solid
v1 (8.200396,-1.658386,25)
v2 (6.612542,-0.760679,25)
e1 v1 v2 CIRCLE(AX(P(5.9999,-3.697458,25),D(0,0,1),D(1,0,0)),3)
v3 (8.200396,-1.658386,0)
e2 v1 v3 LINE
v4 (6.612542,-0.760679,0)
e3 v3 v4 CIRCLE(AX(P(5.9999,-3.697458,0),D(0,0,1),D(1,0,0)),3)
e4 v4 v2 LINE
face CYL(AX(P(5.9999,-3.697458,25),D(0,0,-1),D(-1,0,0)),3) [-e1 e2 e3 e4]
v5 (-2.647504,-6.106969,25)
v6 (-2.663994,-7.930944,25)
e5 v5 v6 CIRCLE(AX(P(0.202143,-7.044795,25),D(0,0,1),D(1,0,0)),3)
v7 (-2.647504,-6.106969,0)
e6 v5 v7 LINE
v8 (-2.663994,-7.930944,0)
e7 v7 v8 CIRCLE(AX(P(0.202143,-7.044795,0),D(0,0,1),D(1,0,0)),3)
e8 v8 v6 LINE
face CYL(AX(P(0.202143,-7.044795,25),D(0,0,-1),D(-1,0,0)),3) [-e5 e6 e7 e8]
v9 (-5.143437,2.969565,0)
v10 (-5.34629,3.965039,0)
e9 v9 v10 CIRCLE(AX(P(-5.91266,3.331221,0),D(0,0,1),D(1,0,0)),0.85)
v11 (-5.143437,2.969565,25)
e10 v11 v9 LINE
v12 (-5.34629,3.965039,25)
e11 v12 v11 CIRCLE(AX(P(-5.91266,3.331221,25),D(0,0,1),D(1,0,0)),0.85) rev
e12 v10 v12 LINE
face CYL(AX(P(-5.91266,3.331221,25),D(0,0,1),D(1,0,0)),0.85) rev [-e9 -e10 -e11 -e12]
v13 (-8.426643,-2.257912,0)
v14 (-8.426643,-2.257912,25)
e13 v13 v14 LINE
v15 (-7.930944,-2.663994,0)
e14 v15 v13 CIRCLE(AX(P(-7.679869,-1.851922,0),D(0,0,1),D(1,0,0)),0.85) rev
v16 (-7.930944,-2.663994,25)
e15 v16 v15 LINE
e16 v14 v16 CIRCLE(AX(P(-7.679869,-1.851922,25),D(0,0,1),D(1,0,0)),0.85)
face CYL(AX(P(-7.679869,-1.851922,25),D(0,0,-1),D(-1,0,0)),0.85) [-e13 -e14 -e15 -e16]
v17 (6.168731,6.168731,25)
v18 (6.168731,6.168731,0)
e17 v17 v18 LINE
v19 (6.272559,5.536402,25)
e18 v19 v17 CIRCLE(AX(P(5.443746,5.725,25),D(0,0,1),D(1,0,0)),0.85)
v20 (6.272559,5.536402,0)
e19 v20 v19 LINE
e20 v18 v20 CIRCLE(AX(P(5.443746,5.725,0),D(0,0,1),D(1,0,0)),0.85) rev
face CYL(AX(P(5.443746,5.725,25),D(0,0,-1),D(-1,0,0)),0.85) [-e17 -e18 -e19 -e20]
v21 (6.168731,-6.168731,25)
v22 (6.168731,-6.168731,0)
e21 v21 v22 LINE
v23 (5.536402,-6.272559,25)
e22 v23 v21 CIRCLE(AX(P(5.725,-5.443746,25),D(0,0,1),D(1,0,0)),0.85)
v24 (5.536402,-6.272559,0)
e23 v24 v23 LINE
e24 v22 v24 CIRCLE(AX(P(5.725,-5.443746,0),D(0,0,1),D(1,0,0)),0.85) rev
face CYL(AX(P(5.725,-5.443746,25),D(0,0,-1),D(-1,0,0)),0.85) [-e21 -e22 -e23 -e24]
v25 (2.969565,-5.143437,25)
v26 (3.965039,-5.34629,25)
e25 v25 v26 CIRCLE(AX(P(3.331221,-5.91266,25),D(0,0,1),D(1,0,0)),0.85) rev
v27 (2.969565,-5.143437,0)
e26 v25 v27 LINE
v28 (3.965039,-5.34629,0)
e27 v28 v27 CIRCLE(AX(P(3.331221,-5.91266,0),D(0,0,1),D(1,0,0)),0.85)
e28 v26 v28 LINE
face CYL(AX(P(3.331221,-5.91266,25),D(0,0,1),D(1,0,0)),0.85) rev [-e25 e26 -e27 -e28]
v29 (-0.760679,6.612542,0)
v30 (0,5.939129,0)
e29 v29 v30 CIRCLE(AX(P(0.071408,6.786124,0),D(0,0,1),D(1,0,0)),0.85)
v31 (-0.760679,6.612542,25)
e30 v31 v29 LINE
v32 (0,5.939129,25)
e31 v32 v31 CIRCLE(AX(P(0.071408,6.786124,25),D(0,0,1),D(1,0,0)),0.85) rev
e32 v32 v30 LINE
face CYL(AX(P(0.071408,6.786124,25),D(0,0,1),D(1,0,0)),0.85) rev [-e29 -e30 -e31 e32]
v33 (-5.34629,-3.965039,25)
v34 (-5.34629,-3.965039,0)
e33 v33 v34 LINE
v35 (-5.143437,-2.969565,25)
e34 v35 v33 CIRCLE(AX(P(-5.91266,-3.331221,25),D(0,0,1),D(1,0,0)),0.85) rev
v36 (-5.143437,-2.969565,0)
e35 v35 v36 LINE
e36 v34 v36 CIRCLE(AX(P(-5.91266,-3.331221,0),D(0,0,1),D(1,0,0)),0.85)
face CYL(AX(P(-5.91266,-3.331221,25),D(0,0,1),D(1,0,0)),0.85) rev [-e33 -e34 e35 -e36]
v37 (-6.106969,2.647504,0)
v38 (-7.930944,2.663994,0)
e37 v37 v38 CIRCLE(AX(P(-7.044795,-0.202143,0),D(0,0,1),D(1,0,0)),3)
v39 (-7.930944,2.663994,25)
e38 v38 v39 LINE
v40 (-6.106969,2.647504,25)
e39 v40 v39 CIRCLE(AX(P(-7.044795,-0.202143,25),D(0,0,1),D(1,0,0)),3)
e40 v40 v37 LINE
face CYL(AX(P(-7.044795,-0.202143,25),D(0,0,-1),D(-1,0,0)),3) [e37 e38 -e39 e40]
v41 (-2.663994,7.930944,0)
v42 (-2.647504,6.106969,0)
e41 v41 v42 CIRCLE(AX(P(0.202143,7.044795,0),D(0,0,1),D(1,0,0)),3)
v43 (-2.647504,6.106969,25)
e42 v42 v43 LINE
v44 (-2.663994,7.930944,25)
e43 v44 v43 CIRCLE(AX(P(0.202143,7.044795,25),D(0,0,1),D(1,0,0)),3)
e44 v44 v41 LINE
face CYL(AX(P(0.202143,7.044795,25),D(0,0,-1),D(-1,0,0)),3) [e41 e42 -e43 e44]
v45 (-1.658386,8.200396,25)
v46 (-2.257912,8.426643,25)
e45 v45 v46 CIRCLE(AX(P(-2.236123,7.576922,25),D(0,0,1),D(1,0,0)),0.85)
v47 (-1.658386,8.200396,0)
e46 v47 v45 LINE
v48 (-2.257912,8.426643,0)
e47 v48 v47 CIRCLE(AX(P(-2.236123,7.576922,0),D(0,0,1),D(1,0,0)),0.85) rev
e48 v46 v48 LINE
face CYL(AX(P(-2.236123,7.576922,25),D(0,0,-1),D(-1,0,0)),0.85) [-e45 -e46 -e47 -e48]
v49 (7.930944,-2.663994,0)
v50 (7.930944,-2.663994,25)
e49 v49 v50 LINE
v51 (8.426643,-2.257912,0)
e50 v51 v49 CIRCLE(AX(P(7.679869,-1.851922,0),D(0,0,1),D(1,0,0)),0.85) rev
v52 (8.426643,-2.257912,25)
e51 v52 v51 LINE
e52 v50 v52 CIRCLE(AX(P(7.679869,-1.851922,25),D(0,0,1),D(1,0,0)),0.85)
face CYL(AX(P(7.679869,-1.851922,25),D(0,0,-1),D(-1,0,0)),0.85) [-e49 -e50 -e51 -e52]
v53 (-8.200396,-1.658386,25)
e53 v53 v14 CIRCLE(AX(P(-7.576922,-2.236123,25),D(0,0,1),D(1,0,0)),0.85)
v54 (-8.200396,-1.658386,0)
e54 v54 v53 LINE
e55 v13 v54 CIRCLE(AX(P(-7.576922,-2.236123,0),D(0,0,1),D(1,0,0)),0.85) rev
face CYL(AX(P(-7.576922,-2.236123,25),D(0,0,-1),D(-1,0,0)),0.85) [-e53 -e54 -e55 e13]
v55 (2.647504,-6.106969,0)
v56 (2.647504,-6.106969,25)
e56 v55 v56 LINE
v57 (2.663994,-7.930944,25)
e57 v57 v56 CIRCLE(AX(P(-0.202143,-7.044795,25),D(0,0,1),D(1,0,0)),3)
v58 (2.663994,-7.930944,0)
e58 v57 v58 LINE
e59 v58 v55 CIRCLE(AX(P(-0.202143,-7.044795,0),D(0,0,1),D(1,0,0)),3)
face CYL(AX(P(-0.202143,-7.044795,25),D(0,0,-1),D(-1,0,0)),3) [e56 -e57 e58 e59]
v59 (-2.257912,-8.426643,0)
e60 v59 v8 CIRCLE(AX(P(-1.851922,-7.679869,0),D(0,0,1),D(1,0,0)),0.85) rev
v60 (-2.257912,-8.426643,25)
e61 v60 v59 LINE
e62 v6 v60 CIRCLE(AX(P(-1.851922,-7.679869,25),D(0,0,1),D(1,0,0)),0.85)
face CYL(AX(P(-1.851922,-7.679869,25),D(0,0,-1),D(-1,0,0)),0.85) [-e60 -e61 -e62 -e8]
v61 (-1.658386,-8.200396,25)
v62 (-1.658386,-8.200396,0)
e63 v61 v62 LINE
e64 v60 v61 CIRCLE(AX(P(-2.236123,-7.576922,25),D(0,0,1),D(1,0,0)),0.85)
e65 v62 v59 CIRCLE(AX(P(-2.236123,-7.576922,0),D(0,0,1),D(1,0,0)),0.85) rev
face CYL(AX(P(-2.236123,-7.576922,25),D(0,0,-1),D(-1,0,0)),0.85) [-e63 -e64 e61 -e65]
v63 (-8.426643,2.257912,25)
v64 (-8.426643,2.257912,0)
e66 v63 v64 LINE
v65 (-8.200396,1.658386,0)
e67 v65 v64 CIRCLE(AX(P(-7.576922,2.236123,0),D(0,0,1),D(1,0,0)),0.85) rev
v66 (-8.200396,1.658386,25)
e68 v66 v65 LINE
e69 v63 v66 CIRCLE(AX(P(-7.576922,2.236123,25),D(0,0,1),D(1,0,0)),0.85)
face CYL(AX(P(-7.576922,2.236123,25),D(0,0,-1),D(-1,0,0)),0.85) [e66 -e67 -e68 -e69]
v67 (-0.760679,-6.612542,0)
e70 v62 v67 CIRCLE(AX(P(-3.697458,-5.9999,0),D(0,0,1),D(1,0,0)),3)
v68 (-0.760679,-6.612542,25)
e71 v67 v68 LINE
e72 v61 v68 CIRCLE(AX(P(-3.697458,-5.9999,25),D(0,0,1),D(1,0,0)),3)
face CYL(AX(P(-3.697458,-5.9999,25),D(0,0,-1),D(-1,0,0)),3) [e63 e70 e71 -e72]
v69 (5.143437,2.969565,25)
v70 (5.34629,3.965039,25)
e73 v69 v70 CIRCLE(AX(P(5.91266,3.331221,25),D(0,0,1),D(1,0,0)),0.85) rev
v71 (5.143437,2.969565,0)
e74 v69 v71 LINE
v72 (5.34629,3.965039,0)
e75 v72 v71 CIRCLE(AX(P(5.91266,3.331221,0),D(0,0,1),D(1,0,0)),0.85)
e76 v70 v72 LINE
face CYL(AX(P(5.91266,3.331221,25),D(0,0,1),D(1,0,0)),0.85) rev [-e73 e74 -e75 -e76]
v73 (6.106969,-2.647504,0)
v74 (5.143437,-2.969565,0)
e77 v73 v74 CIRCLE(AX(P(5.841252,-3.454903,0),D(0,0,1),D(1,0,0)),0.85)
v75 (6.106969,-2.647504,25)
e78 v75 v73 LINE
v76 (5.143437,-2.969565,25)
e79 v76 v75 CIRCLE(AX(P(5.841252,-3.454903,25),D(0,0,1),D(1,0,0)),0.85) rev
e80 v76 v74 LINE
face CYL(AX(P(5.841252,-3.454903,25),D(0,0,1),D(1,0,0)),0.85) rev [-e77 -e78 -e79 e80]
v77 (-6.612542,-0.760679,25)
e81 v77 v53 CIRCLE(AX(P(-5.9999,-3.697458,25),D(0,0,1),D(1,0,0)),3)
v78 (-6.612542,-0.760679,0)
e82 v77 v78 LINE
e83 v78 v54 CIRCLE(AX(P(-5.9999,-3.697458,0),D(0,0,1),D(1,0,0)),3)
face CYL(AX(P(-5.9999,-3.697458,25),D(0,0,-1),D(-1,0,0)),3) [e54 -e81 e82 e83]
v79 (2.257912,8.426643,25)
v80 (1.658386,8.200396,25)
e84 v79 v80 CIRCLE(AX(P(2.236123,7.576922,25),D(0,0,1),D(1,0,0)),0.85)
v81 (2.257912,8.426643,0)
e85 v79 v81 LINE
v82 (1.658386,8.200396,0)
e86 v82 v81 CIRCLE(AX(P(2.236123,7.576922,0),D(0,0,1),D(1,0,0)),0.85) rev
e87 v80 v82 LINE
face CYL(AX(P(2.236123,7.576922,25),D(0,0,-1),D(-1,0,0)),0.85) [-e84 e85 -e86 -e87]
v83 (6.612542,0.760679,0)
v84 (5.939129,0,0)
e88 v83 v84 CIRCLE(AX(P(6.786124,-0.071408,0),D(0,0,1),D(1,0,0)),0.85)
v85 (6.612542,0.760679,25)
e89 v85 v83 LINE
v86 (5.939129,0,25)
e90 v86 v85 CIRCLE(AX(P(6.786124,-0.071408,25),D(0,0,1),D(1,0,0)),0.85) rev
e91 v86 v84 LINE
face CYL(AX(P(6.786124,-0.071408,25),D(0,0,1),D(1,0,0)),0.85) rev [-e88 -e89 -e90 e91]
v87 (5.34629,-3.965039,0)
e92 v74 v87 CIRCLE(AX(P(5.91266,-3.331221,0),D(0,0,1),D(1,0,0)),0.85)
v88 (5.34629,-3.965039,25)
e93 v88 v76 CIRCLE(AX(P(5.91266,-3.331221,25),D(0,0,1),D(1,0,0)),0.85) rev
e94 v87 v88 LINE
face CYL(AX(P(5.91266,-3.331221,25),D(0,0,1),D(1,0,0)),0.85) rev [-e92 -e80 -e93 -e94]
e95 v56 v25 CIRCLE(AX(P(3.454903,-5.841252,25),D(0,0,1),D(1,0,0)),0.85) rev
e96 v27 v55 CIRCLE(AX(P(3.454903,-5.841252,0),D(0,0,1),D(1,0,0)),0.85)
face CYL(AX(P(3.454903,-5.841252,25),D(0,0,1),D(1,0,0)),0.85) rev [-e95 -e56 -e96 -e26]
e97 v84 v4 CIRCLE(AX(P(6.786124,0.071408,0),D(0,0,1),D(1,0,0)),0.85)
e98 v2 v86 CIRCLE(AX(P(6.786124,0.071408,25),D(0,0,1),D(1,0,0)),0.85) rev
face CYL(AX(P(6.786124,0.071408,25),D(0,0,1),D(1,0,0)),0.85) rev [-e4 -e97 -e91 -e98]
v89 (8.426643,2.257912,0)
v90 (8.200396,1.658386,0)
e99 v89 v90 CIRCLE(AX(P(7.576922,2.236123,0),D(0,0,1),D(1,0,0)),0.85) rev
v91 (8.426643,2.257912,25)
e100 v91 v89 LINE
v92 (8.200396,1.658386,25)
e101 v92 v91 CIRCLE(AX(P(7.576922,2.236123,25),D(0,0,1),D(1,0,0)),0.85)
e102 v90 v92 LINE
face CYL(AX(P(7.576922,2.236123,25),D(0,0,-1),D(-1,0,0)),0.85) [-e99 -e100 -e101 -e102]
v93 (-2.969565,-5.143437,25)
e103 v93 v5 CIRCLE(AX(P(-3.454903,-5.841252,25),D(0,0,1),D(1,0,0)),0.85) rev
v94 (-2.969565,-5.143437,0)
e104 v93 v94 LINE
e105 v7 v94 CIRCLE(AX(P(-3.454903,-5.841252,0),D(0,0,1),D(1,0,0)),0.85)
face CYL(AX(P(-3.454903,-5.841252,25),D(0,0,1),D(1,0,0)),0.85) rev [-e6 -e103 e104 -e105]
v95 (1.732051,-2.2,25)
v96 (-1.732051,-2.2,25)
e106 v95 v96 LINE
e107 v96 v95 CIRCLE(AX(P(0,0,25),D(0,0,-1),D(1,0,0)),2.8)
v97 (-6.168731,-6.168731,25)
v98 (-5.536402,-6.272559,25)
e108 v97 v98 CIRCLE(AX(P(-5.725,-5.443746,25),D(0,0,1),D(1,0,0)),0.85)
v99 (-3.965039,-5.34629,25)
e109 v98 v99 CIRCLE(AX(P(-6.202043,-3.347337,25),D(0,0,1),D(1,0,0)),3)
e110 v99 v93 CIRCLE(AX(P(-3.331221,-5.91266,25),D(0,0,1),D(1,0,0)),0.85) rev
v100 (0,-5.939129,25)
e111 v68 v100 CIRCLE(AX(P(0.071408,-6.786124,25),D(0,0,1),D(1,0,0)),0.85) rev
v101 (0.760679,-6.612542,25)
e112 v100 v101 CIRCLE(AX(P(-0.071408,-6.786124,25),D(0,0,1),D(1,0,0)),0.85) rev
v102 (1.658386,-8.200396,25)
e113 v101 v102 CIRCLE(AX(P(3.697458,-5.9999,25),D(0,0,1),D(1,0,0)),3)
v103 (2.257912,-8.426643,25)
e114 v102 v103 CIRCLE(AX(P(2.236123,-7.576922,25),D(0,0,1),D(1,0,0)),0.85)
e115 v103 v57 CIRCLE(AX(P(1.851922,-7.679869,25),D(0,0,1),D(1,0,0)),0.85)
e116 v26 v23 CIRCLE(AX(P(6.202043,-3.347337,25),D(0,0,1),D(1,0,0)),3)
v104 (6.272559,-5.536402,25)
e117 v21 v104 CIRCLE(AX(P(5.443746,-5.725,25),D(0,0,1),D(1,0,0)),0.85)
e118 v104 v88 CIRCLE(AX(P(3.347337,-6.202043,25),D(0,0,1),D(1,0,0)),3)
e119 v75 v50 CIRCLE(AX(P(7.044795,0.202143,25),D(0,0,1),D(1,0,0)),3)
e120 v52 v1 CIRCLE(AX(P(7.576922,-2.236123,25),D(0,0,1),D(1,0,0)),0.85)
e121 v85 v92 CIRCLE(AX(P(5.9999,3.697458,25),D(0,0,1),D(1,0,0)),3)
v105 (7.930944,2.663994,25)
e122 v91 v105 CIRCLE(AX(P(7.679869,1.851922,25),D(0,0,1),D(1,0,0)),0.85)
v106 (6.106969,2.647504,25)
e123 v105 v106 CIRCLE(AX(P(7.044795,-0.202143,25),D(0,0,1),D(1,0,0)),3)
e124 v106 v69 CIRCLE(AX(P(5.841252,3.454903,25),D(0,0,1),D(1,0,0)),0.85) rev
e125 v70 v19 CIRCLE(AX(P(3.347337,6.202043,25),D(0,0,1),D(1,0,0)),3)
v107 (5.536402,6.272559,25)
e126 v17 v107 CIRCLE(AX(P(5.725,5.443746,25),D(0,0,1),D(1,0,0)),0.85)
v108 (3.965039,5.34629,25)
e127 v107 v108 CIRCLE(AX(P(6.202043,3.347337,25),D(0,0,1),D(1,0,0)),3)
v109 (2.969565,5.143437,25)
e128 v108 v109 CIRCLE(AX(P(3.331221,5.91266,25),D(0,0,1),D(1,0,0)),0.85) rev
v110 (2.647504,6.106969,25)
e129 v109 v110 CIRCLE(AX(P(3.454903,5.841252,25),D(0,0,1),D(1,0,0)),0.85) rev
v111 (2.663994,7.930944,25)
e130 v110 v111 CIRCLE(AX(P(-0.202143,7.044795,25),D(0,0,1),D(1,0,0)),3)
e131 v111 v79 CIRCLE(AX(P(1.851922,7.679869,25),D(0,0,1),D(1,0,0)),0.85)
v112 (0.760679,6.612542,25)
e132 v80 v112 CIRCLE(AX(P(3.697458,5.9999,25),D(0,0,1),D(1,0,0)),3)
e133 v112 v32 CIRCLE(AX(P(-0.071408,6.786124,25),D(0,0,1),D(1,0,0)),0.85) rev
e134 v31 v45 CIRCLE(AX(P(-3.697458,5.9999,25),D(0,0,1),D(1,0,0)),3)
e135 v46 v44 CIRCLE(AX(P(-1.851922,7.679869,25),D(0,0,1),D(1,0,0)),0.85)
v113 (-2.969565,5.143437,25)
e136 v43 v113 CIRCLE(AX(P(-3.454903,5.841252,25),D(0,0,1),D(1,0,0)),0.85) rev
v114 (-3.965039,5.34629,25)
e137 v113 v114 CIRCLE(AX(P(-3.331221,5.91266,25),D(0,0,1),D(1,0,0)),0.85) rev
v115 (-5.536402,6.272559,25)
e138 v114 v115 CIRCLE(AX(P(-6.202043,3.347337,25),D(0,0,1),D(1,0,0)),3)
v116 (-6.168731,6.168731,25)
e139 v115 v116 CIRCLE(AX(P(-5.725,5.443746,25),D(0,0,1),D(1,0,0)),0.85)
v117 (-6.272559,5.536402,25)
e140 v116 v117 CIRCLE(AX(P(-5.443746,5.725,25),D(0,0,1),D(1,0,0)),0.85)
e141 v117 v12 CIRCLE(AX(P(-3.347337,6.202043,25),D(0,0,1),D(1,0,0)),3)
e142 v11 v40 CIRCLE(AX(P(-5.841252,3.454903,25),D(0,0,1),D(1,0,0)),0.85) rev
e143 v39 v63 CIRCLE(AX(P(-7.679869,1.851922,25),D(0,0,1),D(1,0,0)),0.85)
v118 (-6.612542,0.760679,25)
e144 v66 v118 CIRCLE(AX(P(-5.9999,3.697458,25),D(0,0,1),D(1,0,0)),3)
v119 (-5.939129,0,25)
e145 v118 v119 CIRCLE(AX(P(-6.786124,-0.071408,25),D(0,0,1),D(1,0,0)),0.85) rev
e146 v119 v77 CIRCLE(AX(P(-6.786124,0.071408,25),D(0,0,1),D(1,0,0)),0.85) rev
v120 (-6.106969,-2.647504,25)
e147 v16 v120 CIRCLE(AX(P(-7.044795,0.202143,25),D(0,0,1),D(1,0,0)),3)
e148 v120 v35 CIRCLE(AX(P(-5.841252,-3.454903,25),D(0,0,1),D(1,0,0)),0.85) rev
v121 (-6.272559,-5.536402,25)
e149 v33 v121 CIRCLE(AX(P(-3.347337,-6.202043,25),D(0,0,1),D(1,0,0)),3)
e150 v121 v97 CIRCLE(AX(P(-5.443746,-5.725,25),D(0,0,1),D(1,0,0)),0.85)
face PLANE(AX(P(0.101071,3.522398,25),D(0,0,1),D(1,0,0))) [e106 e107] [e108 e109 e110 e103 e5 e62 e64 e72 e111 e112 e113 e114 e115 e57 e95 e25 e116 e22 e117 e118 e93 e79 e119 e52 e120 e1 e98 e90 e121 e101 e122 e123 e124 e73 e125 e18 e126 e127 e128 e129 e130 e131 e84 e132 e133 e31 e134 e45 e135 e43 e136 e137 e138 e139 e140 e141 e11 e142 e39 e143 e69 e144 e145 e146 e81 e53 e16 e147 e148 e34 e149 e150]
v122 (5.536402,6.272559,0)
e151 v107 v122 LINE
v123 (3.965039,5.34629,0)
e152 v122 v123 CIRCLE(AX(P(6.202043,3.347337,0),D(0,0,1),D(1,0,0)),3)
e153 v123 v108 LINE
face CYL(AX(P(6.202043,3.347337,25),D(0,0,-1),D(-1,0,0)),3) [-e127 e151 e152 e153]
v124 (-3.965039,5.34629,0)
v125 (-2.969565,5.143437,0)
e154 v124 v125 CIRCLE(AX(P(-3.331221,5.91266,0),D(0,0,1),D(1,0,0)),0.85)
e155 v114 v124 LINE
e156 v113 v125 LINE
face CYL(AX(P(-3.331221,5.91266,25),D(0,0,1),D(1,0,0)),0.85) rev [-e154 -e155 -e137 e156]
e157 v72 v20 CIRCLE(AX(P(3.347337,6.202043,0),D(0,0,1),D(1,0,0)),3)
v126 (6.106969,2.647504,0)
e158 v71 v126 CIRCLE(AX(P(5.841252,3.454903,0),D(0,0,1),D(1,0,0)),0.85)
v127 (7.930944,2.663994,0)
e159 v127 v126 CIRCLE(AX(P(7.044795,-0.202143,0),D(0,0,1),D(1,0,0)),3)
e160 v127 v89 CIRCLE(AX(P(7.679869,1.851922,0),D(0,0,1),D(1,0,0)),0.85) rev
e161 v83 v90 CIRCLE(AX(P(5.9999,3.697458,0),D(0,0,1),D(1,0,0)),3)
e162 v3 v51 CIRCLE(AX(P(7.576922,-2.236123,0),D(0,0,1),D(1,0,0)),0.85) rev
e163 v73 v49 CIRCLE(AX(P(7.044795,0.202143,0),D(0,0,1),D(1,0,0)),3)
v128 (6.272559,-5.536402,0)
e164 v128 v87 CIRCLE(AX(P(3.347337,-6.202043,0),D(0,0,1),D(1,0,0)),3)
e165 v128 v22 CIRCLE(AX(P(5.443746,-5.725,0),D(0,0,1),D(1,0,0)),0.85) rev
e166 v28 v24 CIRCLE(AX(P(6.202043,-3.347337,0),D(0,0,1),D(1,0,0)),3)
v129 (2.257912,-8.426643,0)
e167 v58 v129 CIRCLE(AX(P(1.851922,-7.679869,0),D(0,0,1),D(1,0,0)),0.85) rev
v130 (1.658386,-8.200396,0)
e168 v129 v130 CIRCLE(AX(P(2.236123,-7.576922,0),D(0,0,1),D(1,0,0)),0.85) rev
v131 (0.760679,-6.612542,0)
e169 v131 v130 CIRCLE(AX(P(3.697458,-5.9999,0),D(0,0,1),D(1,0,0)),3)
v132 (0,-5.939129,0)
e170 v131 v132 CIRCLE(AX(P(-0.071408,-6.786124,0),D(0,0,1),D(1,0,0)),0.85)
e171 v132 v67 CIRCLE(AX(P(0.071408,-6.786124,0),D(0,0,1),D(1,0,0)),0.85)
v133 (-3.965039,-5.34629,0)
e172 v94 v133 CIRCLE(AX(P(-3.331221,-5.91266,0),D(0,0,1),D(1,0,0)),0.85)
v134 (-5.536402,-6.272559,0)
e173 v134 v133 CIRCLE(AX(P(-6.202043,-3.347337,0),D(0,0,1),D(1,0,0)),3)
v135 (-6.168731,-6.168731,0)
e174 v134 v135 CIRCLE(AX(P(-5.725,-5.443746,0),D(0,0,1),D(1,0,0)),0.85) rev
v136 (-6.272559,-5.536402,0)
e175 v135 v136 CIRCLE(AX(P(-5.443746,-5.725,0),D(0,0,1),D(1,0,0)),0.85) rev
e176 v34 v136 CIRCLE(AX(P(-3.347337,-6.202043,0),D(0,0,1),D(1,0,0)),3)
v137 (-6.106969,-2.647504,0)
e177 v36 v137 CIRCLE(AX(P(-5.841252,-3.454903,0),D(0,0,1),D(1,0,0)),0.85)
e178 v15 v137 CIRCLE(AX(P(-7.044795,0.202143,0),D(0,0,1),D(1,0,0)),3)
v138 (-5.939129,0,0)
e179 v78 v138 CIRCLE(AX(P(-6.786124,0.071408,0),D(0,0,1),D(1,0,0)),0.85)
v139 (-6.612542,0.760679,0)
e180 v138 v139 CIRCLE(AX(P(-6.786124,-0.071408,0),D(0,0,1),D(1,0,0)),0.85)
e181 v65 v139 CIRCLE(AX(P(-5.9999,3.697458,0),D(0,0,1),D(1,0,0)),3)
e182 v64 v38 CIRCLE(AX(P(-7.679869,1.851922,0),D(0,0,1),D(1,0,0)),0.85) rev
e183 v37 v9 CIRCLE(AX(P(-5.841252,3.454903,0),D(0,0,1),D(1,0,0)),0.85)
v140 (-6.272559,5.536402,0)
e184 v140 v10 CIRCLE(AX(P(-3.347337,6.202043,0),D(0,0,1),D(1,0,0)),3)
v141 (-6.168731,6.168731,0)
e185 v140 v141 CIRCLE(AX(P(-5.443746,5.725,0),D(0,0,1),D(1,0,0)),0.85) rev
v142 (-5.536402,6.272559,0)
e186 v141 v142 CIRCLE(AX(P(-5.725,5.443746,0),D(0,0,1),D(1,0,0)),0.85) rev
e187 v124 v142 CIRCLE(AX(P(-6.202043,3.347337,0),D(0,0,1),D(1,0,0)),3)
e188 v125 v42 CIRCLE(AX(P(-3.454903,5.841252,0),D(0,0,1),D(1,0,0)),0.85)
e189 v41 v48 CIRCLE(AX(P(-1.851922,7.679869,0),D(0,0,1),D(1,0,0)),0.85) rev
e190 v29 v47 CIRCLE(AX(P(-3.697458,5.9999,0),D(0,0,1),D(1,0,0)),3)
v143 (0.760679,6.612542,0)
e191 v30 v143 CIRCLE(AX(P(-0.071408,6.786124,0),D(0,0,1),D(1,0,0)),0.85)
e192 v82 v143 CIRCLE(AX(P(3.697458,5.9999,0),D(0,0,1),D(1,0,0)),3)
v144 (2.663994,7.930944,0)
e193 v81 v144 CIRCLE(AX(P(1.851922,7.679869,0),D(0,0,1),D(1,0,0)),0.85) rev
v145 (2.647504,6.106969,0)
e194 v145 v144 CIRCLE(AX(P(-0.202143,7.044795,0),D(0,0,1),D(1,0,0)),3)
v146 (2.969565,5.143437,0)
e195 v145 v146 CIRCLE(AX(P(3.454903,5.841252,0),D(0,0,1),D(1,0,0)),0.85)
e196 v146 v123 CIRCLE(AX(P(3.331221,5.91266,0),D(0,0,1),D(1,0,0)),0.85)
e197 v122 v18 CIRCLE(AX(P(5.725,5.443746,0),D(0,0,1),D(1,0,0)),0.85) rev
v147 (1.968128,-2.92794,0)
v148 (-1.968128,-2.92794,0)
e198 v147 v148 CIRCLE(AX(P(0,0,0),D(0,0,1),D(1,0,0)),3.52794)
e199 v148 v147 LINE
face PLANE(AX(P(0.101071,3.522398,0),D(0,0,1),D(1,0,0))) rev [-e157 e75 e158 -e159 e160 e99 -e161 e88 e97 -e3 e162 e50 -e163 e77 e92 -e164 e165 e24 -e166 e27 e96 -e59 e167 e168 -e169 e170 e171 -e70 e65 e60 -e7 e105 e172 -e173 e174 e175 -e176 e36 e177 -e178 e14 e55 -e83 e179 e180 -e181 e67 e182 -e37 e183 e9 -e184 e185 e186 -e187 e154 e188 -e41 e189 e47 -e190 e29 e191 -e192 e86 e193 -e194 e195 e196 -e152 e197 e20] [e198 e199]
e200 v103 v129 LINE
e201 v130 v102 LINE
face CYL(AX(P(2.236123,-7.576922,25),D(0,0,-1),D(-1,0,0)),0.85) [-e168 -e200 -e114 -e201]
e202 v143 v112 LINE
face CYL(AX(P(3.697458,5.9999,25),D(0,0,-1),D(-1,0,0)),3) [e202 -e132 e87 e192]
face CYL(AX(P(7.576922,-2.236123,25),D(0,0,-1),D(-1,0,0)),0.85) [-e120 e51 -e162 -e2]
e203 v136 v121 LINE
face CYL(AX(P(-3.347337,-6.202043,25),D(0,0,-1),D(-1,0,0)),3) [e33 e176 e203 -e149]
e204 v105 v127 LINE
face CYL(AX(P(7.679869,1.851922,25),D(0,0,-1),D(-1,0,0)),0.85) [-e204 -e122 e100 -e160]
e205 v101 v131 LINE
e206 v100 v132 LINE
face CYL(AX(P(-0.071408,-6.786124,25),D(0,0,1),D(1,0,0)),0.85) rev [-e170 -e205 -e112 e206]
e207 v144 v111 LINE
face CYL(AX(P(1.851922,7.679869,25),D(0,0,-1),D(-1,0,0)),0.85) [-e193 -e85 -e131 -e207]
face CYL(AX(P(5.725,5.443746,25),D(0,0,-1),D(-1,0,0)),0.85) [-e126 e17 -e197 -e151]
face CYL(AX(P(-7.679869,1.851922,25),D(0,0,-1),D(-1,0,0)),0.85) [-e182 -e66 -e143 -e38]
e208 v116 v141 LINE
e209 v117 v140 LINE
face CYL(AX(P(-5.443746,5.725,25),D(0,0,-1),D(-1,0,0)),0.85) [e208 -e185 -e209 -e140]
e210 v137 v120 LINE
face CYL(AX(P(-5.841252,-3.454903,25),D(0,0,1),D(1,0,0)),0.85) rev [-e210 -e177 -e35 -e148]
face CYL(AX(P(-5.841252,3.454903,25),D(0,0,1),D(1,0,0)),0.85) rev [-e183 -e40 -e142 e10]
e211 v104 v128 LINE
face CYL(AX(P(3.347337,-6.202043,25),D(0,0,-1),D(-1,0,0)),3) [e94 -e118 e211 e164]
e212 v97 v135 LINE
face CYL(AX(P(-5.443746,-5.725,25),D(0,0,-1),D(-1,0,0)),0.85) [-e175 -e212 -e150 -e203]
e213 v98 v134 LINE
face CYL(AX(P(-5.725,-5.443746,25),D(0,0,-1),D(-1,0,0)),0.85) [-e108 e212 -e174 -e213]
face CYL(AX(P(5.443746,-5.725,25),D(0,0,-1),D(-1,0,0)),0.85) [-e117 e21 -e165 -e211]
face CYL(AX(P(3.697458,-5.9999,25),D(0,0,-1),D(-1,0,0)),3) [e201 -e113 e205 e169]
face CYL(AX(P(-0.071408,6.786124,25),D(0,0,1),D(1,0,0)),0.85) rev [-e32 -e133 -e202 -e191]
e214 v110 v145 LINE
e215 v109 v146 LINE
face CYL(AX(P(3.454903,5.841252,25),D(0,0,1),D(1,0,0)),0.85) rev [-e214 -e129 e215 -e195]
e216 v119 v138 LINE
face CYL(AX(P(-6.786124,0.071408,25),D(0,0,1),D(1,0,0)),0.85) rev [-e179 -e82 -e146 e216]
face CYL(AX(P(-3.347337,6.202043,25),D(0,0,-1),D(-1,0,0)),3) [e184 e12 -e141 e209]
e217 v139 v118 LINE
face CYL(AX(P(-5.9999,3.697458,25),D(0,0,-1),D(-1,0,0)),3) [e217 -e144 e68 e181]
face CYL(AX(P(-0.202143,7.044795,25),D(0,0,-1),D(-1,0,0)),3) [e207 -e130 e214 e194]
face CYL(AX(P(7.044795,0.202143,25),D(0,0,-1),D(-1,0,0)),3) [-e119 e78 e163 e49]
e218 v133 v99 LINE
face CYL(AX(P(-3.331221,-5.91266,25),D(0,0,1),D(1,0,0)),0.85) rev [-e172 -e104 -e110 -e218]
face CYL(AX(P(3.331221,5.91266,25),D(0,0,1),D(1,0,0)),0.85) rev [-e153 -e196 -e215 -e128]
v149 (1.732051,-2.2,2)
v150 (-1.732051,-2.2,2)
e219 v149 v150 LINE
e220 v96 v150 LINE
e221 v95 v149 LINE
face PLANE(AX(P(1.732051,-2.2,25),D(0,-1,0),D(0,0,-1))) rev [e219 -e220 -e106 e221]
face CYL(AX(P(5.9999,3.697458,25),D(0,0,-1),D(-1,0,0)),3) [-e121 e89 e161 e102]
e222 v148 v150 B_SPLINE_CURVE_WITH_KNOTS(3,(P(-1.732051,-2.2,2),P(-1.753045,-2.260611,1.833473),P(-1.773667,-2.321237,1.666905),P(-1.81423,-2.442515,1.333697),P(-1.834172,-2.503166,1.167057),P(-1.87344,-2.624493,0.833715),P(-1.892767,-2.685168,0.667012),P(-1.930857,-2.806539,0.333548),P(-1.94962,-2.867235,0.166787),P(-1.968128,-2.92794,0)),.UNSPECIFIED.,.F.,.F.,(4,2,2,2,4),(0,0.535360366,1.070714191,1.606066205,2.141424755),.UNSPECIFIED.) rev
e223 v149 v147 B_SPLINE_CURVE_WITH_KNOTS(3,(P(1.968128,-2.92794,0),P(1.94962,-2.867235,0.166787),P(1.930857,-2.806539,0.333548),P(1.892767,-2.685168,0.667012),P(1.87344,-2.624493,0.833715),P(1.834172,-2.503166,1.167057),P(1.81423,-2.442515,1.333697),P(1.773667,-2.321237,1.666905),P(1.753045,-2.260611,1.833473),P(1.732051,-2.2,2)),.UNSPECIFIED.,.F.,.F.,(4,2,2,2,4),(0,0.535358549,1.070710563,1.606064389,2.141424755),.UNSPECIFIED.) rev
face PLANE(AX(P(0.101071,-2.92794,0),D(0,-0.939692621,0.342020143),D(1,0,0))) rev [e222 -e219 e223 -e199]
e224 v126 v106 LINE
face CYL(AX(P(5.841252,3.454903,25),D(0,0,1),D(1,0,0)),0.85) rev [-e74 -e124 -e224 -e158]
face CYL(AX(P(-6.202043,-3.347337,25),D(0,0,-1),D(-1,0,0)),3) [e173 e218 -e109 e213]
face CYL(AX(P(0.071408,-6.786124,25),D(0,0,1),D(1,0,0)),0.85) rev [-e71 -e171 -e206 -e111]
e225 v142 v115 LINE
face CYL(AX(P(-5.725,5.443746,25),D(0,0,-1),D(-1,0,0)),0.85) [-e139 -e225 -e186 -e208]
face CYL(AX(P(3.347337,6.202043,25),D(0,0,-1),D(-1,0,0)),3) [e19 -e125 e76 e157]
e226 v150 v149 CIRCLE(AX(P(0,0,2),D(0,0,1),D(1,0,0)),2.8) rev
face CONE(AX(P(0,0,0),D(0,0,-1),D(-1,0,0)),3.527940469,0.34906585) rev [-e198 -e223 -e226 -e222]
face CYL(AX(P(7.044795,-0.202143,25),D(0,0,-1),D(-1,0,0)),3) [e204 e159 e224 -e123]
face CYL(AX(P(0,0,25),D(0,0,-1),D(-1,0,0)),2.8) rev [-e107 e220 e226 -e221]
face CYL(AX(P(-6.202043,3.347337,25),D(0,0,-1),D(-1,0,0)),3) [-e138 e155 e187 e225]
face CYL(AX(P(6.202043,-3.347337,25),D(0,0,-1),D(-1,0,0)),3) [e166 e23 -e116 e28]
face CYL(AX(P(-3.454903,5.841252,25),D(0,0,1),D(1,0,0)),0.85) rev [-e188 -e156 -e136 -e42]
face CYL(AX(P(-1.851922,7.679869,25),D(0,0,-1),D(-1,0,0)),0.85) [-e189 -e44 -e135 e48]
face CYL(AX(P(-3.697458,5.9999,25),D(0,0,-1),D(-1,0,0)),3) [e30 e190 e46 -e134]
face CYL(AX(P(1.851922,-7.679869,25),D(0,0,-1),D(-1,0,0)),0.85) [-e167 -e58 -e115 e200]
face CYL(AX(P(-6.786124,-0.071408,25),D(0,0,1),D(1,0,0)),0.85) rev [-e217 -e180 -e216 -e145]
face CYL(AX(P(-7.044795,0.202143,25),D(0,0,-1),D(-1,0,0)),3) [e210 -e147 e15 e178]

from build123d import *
from OCP.BRepFilletAPI import BRepFilletAPI_MakeChamfer

# Parameters (mm, degrees)
BOSS_EXTRUDE1_DEPTH     = 25
FILLET1_R               = 0.85
CUT_EXTRUDE1_DEPTH      = 28.69523507
CUT_EXTRUDE1_DEPTH_BACK = 28.69523507
CHAMFER1_SIZE           = 2
CHAMFER1_SIZE2          = 0.727940469


with BuildPart() as part:
    # Sketch2 → Boss-Extrude1 (new body)
    with BuildSketch(Plane.XY):
        with BuildLine():
            ThreePointArc((5.45501044, -2.341984918), (6.905444148, -2.794619237), (8.391623483, -2.478538947))
            ThreePointArc((8.391623483, -2.478538947), (8.45185098, -2.264666645), (8.506628589, -2.049334049))
            ThreePointArc((8.506628589, -2.049334049), (7.377599675, -1.03251082), (5.895170077, -0.699286786))
            ThreePointArc((5.895170077, -0.699286786), (5.9365, 0), (5.895170077, 0.699286786))
            ThreePointArc((5.895170077, 0.699286786), (7.377599675, 1.03251082), (8.506628589, 2.049334049))
            ThreePointArc((8.506628589, 2.049334049), (8.45185098, 2.264666645), (8.391623483, 2.478538947))
            ThreePointArc((8.391623483, 2.478538947), (6.905444148, 2.794619237), (5.45501044, 2.341984918))
            ThreePointArc((5.45501044, 2.341984918), (5.14115981, 2.96825), (4.755723654, 3.55318516))
            ThreePointArc((4.755723654, 3.55318516), (5.872933327, 4.582980438), (6.342289434, 6.028089642))
            ThreePointArc((6.342289434, 6.028089642), (6.187184335, 6.187184335), (6.028089642, 6.342289434))
            ThreePointArc((6.028089642, 6.342289434), (4.582980438, 5.872933327), (3.55318516, 4.755723654))
            ThreePointArc((3.55318516, 4.755723654), (2.96825, 5.14115981), (2.341984918, 5.45501044))
            ThreePointArc((2.341984918, 5.45501044), (2.794619237, 6.905444148), (2.478538947, 8.391623483))
            ThreePointArc((2.478538947, 8.391623483), (2.264666645, 8.45185098), (2.049334049, 8.506628589))
            ThreePointArc((2.049334049, 8.506628589), (1.03251082, 7.377599675), (0.699286786, 5.895170077))
            ThreePointArc((0.699286786, 5.895170077), (0, 5.9365), (-0.699286786, 5.895170077))
            ThreePointArc((-0.699286786, 5.895170077), (-1.03251082, 7.377599675), (-2.049334049, 8.506628589))
            ThreePointArc((-2.049334049, 8.506628589), (-2.264666645, 8.45185098), (-2.478538947, 8.391623483))
            ThreePointArc((-2.478538947, 8.391623483), (-2.794619237, 6.905444148), (-2.341984918, 5.45501044))
            ThreePointArc((-2.341984918, 5.45501044), (-2.96825, 5.14115981), (-3.55318516, 4.755723654))
            ThreePointArc((-3.55318516, 4.755723654), (-4.582980438, 5.872933327), (-6.028089642, 6.342289434))
            ThreePointArc((-6.028089642, 6.342289434), (-6.187184335, 6.187184335), (-6.342289434, 6.028089642))
            ThreePointArc((-6.342289434, 6.028089642), (-5.872933327, 4.582980438), (-4.755723654, 3.55318516))
            ThreePointArc((-4.755723654, 3.55318516), (-5.14115981, 2.96825), (-5.45501044, 2.341984918))
            ThreePointArc((-5.45501044, 2.341984918), (-6.905444148, 2.794619237), (-8.391623483, 2.478538947))
            ThreePointArc((-8.391623483, 2.478538947), (-8.45185098, 2.264666645), (-8.506628589, 2.049334049))
            ThreePointArc((-8.506628589, 2.049334049), (-7.377599675, 1.03251082), (-5.895170077, 0.699286786))
            ThreePointArc((-5.895170077, 0.699286786), (-5.9365, 0), (-5.895170077, -0.699286786))
            ThreePointArc((-5.895170077, -0.699286786), (-7.377599675, -1.03251082), (-8.506628589, -2.049334049))
            ThreePointArc((-8.506628589, -2.049334049), (-8.45185098, -2.264666645), (-8.391623483, -2.478538947))
            ThreePointArc((-8.391623483, -2.478538947), (-6.905444148, -2.794619237), (-5.45501044, -2.341984918))
            ThreePointArc((-5.45501044, -2.341984918), (-5.14115981, -2.96825), (-4.755723654, -3.55318516))
            ThreePointArc((-4.755723654, -3.55318516), (-5.872933327, -4.582980438), (-6.342289434, -6.028089642))
            ThreePointArc((-6.342289434, -6.028089642), (-6.187184335, -6.187184335), (-6.028089642, -6.342289434))
            ThreePointArc((-6.028089642, -6.342289434), (-4.582980438, -5.872933327), (-3.55318516, -4.755723654))
            ThreePointArc((-3.55318516, -4.755723654), (-2.96825, -5.14115981), (-2.341984918, -5.45501044))
            ThreePointArc((-2.341984918, -5.45501044), (-2.794619237, -6.905444148), (-2.478538947, -8.391623483))
            ThreePointArc((-2.478538947, -8.391623483), (-2.264666645, -8.45185098), (-2.049334049, -8.506628589))
            ThreePointArc((-2.049334049, -8.506628589), (-1.03251082, -7.377599675), (-0.699286786, -5.895170077))
            ThreePointArc((-0.699286786, -5.895170077), (0, -5.9365), (0.699286786, -5.895170077))
            ThreePointArc((0.699286786, -5.895170077), (1.03251082, -7.377599675), (2.049334049, -8.506628589))
            ThreePointArc((2.049334049, -8.506628589), (2.264666645, -8.45185098), (2.478538947, -8.391623483))
            ThreePointArc((2.478538947, -8.391623483), (2.794619237, -6.905444148), (2.341984918, -5.45501044))
            ThreePointArc((2.341984918, -5.45501044), (2.96825, -5.14115981), (3.55318516, -4.755723654))
            ThreePointArc((3.55318516, -4.755723654), (4.582980438, -5.872933327), (6.028089642, -6.342289434))
            ThreePointArc((6.028089642, -6.342289434), (6.187184335, -6.187184335), (6.342289434, -6.028089642))
            ThreePointArc((6.342289434, -6.028089642), (5.872933327, -4.582980438), (4.755723654, -3.55318516))
            ThreePointArc((4.755723654, -3.55318516), (5.14115981, -2.96825), (5.45501044, -2.341984918))
        make_face()
    extrude(amount=BOSS_EXTRUDE1_DEPTH)

    # Fillet1
    # the kernel refuses this fillet: 0.85 mm, written as the material it adds along each edge
    with BuildSketch(Plane(origin=(-0.699286786, 5.895170077, 0), x_dir=(0.9985545717483048, 0.053747253330377776, 0), z_dir=(0, 0, 1)), Plane(origin=(2.341984918, 5.45501044, 0), x_dir=(0.8916472528643112, -0.4527307991064083, 0), z_dir=(0, 0, 1)), Plane(origin=(4.755723654, 3.55318516, 0), x_dir=(0.5458237726418961, -0.8378999995339347, 0), z_dir=(0, 0, 1)), Plane(origin=(5.895170077, 0.699286786, 0), x_dir=(0.053747253330377526, -0.9985545717483046, 0), z_dir=(0, 0, 1)), Plane(origin=(5.45501044, -2.341984918, 0), x_dir=(-0.4527307991064139, -0.8916472528643083, 0), z_dir=(0, 0, 1)), Plane(origin=(3.55318516, -4.755723654, 0), x_dir=(-0.8378999995339357, -0.5458237726418947, 0), z_dir=(0, 0, 1)), Plane(origin=(0.699286786, -5.895170077, 0), x_dir=(-0.9985545717483045, -0.053747253330380974, 0), z_dir=(0, 0, 1)), Plane(origin=(-2.341984918, -5.45501044, 0), x_dir=(-0.8916472528643078, 0.45273079910641506, 0), z_dir=(0, 0, 1)), Plane(origin=(-4.755723654, -3.55318516, 0), x_dir=(-0.5458237726418926, 0.837899999533937, 0), z_dir=(0, 0, 1)), Plane(origin=(-5.895170077, -0.699286786, 0), x_dir=(-0.05374725333036718, 0.9985545717483052, 0), z_dir=(0, 0, 1)), Plane(origin=(-5.45501044, 2.341984918, 0), x_dir=(0.4527307991064148, 0.8916472528643078, 0), z_dir=(0, 0, 1)), Plane(origin=(-3.55318516, 4.755723654, 0), x_dir=(0.8378999995339407, 0.5458237726418868, 0), z_dir=(0, 0, 1))) as fillet1_piece_1:
        with BuildLine():
            CenterArc((0.817467093, 0.848243697), FILLET1_R, 188.702518153, 77.61362583)
            ThreePointArc((-0.022747059, 0.719635073), (0.010293641, 0.360502417), (0, 0))
            ThreePointArc((0, 0), (0.381426817, 0.012266224), (0.762853635, 0))
        make_face()
    extrude(amount=25)
    with BuildSketch(Plane(origin=(0.699286786, 5.895170077, 0), x_dir=(0.08526813636279139, 0.9963580405262039, 0), z_dir=(0, 0, 1)), Plane(origin=(3.55318516, 4.755723654, 0), x_dir=(0.5720233924866368, 0.8202373061791809, 0), z_dir=(0, 0, 1)), Plane(origin=(5.45501044, 2.341984918, 0), x_dir=(0.9055054425419776, 0.42433464803956017, 0), z_dir=(0, 0, 1)), Plane(origin=(5.895170077, -0.699286786, 0), x_dir=(0.9963580405262035, -0.08526813636279691, 0), z_dir=(0, 0, 1)), Plane(origin=(4.755723654, -3.55318516, 0), x_dir=(0.8202373061791792, -0.5720233924866389, 0), z_dir=(0, 0, 1)), Plane(origin=(2.341984918, -5.45501044, 0), x_dir=(0.4243346480395612, -0.9055054425419772, 0), z_dir=(0, 0, 1)), Plane(origin=(-3.55318516, -4.755723654, 0), x_dir=(-0.5720233924866378, -0.8202373061791799, 0), z_dir=(0, 0, 1)), Plane(origin=(-5.45501044, -2.341984918, 0), x_dir=(-0.9055054425419786, -0.42433464803955767, 0), z_dir=(0, 0, 1)), Plane(origin=(-5.895170077, 0.699286786, 0), x_dir=(-0.9963580405262031, 0.08526813636279934, 0), z_dir=(0, 0, 1)), Plane(origin=(-4.755723654, 3.55318516, 0), x_dir=(-0.8202373061791736, 0.572023392486647, 0), z_dir=(0, 0, 1)), Plane(origin=(-2.341984918, 5.45501044, 0), x_dir=(-0.4243346480395532, 0.9055054425419808, 0), z_dir=(0, 0, 1))) as fillet1_piece_2:
        with BuildLine():
            CenterArc((0.82199371, 0.843857902), FILLET1_R, 185.494324585, 77.61362583)
            ThreePointArc((-0.024101124, 0.762472822), (0.000209539, 0.381623942), (0, 0))
            ThreePointArc((0, 0), (0.359997245, 0.021677992), (0.719994491, 0))
        make_face()
    extrude(amount=25)
    with BuildSketch(Plane(origin=(-0.699286786, -5.895170077, 0), x_dir=(0.9985545717483045, -0.05374725333038154, 0), z_dir=(0, 0, 1))) as fillet1_piece_3:
        with BuildLine():
            CenterArc((0.817467093, -0.848243697), FILLET1_R, 93.683856017, 77.61362583)
            ThreePointArc((-0.022747059, -0.719635073), (0.010293641, -0.360502417), (0, 0))
            ThreePointArc((0, 0), (0.381426817, -0.012266224), (0.762853635, 0))
        make_face()
    extrude(amount=25)
    # the kernel refuses this fillet: 0.85 mm, written as the material it takes off along each edge
    with BuildSketch(Plane(origin=(-2.478538947, 8.391623483, -1.241518227), x_dir=(0.9658977457013398, 0.2589238205516633, 0), z_dir=(0, 0, 1)), Plane(origin=(2.049334049, 8.506628589, -1.241518227), x_dir=(0.9659538955113092, -0.2587142666080226, 0), z_dir=(0, 0, 1)), Plane(origin=(6.028089642, 6.342289434, -1.241518227), x_dir=(0.7071834790933315, -0.7070300749596524, 0), z_dir=(0, 0, 1)), Plane(origin=(8.391623483, 2.478538947, -1.241518227), x_dir=(0.25892382055164814, -0.9658977457013438, 0), z_dir=(0, 0, 1)), Plane(origin=(8.506628589, -2.049334049, -1.241518227), x_dir=(-0.2587142666080043, -0.965953895511314, 0), z_dir=(0, 0, 1)), Plane(origin=(6.342289434, -6.028089642, -1.241518227), x_dir=(-0.7070300749596584, -0.7071834790933254, 0), z_dir=(0, 0, 1)), Plane(origin=(2.478538947, -8.391623483, -1.241518227), x_dir=(-0.9658977457013397, -0.25892382055166346, 0), z_dir=(0, 0, 1)), Plane(origin=(-2.049334049, -8.506628589, -1.241518227), x_dir=(-0.9659538955113074, 0.25871426660802904, 0), z_dir=(0, 0, 1)), Plane(origin=(-6.028089642, -6.342289434, -1.241518227), x_dir=(-0.7071834790933234, 0.7070300749596604, 0), z_dir=(0, 0, 1)), Plane(origin=(-8.506628589, 2.049334049, -1.241518227), x_dir=(0.25871426660802577, 0.9659538955113082, 0), z_dir=(0, 0, 1)), Plane(origin=(-6.342289434, 6.028089642, -1.241518227), x_dir=(0.7070300749596685, 0.7071834790933154, 0), z_dir=(0, 0, 1)), Plane(origin=(-8.391623483, -2.478538947, -1.241518227), x_dir=(-0.2589238205516369, 0.9658977457013469, 0), z_dir=(0, 0, 1))) as fillet1_2_piece_1:
        with BuildLine():
            CenterArc((0.420957609, -0.849728289), FILLET1_R, 88.551251373, 59.262022264)
            ThreePointArc((-0.298411496, -0.396950098), (-0.157433543, -0.192289716), (0, 0))
            ThreePointArc((0, 0), (0.221223969, 0.002797021), (0.442447937, 0))
        make_face()
    extrude(amount=27.483036454, mode=Mode.SUBTRACT)
    with BuildSketch(Plane(origin=(-2.049334049, 8.506628589, -1.241518227), x_dir=(0.7872385442579439, -0.6166485826097658, 0), z_dir=(0, 0, 1)), Plane(origin=(2.478538947, 8.391623483, -1.241518227), x_dir=(0.3734442868607768, -0.9276526098766962, 0), z_dir=(0, 0, 1)), Plane(origin=(6.342289434, 6.028089642, -1.241518227), x_dir=(-0.14041406561875278, -0.9900928694705425, 0), z_dir=(0, 0, 1)), Plane(origin=(8.506628589, 2.049334049, -1.241518227), x_dir=(-0.6166485826097687, -0.7872385442579418, 0), z_dir=(0, 0, 1)), Plane(origin=(8.391623483, -2.478538947, -1.241518227), x_dir=(-0.9276526098766967, -0.3734442868607755, 0), z_dir=(0, 0, 1)), Plane(origin=(6.028089642, -6.342289434, -1.241518227), x_dir=(-0.9900928694705423, 0.14041406561875375, 0), z_dir=(0, 0, 1)), Plane(origin=(2.049334049, -8.506628589, -1.241518227), x_dir=(-0.7872385442579395, 0.6166485826097715, 0), z_dir=(0, 0, 1)), Plane(origin=(-2.478538947, -8.391623483, -1.241518227), x_dir=(-0.37344428686077513, 0.927652609876697, 0), z_dir=(0, 0, 1)), Plane(origin=(-6.342289434, -6.028089642, -1.241518227), x_dir=(0.14041406561875172, 0.9900928694705425, 0), z_dir=(0, 0, 1)), Plane(origin=(-8.506628589, -2.049334049, -1.241518227), x_dir=(0.6166485826097806, 0.7872385442579324, 0), z_dir=(0, 0, 1)), Plane(origin=(-8.391623483, 2.478538947, -1.241518227), x_dir=(0.9276526098767012, 0.3734442868607644, 0), z_dir=(0, 0, 1)), Plane(origin=(-6.028089642, 6.342289434, -1.241518227), x_dir=(0.9900928694705411, -0.140414065618762, 0), z_dir=(0, 0, 1))) as fillet1_2_piece_2:
        with BuildLine():
            CenterArc((0.426254591, -0.847083525), FILLET1_R, 85.252318452, 59.262022264)
            ThreePointArc((-0.265867122, -0.35365923), (-0.135169287, -0.175148884), (0, 0))
            ThreePointArc((0, 0), (0.248303645, 0.010293443), (0.496607291, 0))
        make_face()
    extrude(amount=27.483036454, mode=Mode.SUBTRACT)

    # Sketch3 → Cut-Extrude1 (cut, two sides: drawn at the far end of the back side and taken through both)
    with BuildSketch(Plane(origin=(0, 0, 0), x_dir=(-1, 0, 0), z_dir=(0, 0, -1)).offset(-CUT_EXTRUDE1_DEPTH_BACK)):
        with BuildLine():
            Line((-1.732050808, -2.2), (1.732050808, -2.2))
            ThreePointArc((1.732050808, -2.2), (0, 2.8), (-1.732050808, -2.2))
        make_face()
    extrude(amount=CUT_EXTRUDE1_DEPTH + CUT_EXTRUDE1_DEPTH_BACK, mode=Mode.SUBTRACT)

    # Chamfer1: one chamfer whose edges measure the first distance from different faces: ONE call of the kernel's chamfer builder (chamfer() names one face for all edges)
    chamfer1_edges_1 = [part.edges().sort_by_distance(p)[0] for p in [
        (0, -2.2, 0),
    ]]
    chamfer1_side_1 = [part.faces().sort_by_distance(p)[0] for p in [
        (0, -2.2, 12.5),
    ]]
    chamfer1_edges_2 = [part.edges().sort_by_distance(p)[0] for p in [
        (0, 2.8, 0),
    ]]
    chamfer1_side_2 = [part.faces().sort_by_distance(p)[0] for p in [
        (0, 2.8, 12.5),
    ]]
    chamfer1 = BRepFilletAPI_MakeChamfer(part.part.solid().wrapped)
    for e in chamfer1_edges_1:
        chamfer1.Add(CHAMFER1_SIZE, CHAMFER1_SIZE2, e.wrapped, chamfer1_side_1[0].wrapped)  # the first distance lies on this face
    for e in chamfer1_edges_2:
        chamfer1.Add(CHAMFER1_SIZE, CHAMFER1_SIZE2, e.wrapped, chamfer1_side_2[0].wrapped)  # the first distance lies on this face
    add(Compound.cast(chamfer1.Shape()), mode=Mode.REPLACE)


solid = part.part
